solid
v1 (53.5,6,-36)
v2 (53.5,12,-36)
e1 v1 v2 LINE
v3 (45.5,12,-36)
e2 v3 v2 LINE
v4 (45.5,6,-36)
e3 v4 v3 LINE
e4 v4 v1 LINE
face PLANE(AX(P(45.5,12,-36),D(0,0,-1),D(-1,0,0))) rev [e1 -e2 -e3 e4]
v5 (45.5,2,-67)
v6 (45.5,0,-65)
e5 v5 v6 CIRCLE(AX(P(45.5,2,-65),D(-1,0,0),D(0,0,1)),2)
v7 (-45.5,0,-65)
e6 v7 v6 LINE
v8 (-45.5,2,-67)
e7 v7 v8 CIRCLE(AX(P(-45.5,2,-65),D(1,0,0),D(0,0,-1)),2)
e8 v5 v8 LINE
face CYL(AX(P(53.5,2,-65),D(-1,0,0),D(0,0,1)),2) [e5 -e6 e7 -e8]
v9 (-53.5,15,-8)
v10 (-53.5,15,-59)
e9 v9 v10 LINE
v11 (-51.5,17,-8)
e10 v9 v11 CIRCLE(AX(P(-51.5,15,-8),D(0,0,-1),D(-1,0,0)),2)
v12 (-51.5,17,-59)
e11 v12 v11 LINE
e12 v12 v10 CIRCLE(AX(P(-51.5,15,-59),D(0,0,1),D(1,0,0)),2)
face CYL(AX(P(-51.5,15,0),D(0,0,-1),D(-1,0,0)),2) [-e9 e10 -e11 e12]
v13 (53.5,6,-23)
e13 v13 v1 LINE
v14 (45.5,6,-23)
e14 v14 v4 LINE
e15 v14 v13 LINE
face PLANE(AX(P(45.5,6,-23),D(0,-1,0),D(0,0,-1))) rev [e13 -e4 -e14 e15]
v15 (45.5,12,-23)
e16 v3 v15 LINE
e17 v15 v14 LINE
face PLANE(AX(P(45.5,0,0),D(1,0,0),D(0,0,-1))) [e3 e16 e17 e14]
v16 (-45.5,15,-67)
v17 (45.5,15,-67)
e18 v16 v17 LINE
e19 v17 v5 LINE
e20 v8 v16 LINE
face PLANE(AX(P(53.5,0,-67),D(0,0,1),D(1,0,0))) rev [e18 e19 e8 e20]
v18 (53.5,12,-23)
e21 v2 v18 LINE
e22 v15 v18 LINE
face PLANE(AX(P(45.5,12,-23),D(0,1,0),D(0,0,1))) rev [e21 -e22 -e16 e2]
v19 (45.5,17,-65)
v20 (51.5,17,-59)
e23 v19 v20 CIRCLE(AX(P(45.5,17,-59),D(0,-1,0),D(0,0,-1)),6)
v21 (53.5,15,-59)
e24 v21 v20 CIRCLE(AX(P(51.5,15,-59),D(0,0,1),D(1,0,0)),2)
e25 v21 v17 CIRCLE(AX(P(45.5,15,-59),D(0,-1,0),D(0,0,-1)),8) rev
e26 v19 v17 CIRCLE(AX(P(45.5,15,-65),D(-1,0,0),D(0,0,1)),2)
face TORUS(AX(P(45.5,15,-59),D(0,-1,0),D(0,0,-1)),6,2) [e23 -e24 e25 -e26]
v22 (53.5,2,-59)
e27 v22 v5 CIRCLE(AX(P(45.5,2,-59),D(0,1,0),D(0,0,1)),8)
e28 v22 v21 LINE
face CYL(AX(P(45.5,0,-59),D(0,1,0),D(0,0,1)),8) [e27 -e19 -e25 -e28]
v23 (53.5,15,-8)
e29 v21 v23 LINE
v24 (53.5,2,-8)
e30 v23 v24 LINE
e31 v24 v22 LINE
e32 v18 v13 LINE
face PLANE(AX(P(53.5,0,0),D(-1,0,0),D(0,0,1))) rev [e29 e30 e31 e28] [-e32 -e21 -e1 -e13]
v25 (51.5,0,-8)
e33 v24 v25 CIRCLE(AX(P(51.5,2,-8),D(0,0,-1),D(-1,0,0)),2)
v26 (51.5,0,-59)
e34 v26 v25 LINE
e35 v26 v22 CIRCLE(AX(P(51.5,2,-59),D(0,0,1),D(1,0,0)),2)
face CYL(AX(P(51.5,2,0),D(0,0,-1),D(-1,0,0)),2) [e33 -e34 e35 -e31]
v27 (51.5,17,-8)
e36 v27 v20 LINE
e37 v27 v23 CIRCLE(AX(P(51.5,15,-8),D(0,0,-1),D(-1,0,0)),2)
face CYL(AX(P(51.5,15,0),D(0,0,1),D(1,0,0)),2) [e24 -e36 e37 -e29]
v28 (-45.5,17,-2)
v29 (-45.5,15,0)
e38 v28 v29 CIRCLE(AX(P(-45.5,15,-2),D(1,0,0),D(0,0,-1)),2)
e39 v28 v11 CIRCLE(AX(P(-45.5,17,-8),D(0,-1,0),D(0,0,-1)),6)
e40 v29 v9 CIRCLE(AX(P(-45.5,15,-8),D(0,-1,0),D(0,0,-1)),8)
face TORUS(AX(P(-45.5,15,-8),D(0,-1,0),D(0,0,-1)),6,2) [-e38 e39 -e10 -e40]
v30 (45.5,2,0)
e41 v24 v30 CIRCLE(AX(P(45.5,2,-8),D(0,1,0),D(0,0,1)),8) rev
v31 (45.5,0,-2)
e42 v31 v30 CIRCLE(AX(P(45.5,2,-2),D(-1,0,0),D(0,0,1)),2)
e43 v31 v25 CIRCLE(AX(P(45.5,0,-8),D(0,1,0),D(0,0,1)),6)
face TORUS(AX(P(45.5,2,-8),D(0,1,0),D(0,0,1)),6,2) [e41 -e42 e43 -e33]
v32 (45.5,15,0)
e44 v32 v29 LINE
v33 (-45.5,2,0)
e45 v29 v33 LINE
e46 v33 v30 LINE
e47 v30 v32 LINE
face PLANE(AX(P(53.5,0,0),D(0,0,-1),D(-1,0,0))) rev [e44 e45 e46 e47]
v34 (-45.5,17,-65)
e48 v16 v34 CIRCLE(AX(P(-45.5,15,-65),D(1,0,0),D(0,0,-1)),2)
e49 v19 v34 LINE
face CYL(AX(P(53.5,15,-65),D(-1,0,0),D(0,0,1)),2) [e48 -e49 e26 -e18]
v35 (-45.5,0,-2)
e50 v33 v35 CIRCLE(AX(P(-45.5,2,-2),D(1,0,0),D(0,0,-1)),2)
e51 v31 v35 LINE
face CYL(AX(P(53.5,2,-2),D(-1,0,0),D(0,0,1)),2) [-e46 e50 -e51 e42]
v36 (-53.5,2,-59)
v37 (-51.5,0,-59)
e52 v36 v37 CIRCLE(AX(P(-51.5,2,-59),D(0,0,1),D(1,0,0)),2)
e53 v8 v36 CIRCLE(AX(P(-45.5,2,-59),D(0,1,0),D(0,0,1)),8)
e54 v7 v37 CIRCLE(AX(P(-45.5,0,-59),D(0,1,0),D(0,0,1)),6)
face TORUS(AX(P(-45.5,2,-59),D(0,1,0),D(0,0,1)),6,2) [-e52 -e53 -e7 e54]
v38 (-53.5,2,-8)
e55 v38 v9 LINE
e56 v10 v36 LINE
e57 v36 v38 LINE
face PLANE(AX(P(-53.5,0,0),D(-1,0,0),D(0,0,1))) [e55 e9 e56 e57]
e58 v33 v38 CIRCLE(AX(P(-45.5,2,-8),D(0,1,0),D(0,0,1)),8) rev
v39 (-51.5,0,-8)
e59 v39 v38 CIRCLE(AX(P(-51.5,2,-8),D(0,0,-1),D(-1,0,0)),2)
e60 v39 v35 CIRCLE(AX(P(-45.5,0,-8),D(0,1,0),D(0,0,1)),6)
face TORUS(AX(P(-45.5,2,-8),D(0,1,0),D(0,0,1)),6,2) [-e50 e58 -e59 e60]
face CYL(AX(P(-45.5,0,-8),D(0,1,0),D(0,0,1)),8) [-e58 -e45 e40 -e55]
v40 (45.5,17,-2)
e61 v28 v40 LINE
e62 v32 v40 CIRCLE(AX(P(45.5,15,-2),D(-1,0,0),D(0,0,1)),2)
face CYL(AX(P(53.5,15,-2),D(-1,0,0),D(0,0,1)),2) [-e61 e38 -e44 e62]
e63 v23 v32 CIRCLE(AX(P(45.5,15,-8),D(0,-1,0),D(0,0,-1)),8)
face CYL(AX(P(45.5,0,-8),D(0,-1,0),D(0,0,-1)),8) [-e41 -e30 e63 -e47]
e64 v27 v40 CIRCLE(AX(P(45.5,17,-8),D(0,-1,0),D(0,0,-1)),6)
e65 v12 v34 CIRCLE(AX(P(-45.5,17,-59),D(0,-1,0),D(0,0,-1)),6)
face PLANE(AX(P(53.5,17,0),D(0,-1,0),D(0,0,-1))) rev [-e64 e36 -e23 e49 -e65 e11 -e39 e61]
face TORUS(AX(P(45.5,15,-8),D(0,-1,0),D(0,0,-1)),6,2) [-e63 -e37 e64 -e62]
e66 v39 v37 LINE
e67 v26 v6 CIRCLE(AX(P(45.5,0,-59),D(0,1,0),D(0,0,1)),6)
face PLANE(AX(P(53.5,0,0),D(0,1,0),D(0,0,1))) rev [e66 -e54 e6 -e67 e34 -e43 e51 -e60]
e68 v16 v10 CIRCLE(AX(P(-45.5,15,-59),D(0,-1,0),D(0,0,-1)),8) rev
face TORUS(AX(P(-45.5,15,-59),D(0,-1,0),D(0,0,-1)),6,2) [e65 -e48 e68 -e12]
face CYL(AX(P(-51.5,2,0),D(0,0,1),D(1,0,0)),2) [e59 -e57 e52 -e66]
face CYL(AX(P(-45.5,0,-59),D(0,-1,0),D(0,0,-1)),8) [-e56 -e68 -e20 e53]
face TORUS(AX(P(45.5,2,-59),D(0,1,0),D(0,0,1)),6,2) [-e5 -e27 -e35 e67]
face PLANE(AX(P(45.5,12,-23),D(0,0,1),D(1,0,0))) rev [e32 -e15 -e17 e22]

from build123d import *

# Parameters (mm, degrees)
SKETCH1_W           = 67
SKETCH1_H           = 17
BOSS_EXTRUDE1_DEPTH = 53.5
FILLET1_R           = 2
FILLET2_R           = 8
SKETCH2_W           = 13
SKETCH2_H           = 6
CUT_EXTRUDE1_DEPTH  = 8


with BuildPart() as part:
    # Sketch1 → Boss-Extrude1 (new, symmetric)
    with BuildSketch(Plane(origin=(0, 0, 0), x_dir=(0, 0, -1), z_dir=(1, 0, 0))):
        with Locations((33.5, 8.5)):
            Rectangle(SKETCH1_W, SKETCH1_H)
    extrude(amount=BOSS_EXTRUDE1_DEPTH, both=True)

    # Fillet1
    fillet1_edges = [part.edges().sort_by_distance(p)[0] for p in [
        (53.5, 17, -33.5),
        (-53.5, 17, -33.5),
        (-53.5, 0, -33.5),
        (0, 17, 0),
        (0, 17, -67),
        (0, 0, -67),
        (0, 0, 0),
        (53.5, 0, -33.5),
    ]]
    fillet(fillet1_edges, radius=FILLET1_R)

    # Fillet2
    # the kernel refuses this fillet: 8 mm, written as the material it takes off along each edge
    with BuildSketch(Plane(origin=(45.5, 0, -8), x_dir=(1, 0, 0), z_dir=(0, 0, -1))) as fillet2_piece_1:
        with BuildLine():
            CenterArc((6, -2), 2, 0, 90)
            Line((8, -2), (8, 0))
            Line((8, 0), (6, 0))
        make_face()
    revolve(axis=Axis((45.5, 0, -8), (0, -1, 0)), revolution_arc=90, mode=Mode.SUBTRACT)
    with BuildSketch(Plane(origin=(45.5, 0, -59), x_dir=(0, 0, -1), z_dir=(-1, 0, 0))) as fillet2_piece_2:
        with BuildLine():
            CenterArc((6, -2), 2, 0, 90)
            Line((8, -2), (8, 0))
            Line((8, 0), (6, 0))
        make_face()
    revolve(axis=Axis((45.5, 0, -59), (0, -1, 0)), revolution_arc=90, mode=Mode.SUBTRACT)
    with BuildSketch(Plane(origin=(-45.5, 0, -8), x_dir=(0, 0, 1), z_dir=(1, 0, 0))) as fillet2_piece_3:
        with BuildLine():
            CenterArc((6, -2), 2, 0, 90)
            Line((8, -2), (8, 0))
            Line((8, 0), (6, 0))
        make_face()
    revolve(axis=Axis((-45.5, 0, -8), (0, -1, 0)), revolution_arc=90, mode=Mode.SUBTRACT)
    with BuildSketch(Plane(origin=(-45.5, 0, -59), x_dir=(-1, 0, 0), z_dir=(0, 0, 1))) as fillet2_piece_4:
        with BuildLine():
            CenterArc((6, -2), 2, 0, 90)
            Line((8, -2), (8, 0))
            Line((8, 0), (6, 0))
        make_face()
    revolve(axis=Axis((-45.5, 0, -59), (0, -1, 0)), revolution_arc=90, mode=Mode.SUBTRACT)
    with BuildSketch(Plane(origin=(45.5, 17, -59), x_dir=(1, 0, 0), z_dir=(0, 0, 1))) as fillet2_piece_5:
        with BuildLine():
            CenterArc((6, -2), 2, 0, 90)
            Line((8, -2), (8, 0))
            Line((8, 0), (6, 0))
        make_face()
    revolve(axis=Axis((45.5, 17, -59), (0, 1, 0)), revolution_arc=90, mode=Mode.SUBTRACT)
    with BuildSketch(Plane(origin=(45.5, 17, -8), x_dir=(0, 0, 1), z_dir=(-1, 0, 0))) as fillet2_piece_6:
        with BuildLine():
            CenterArc((6, -2), 2, 0, 90)
            Line((8, -2), (8, 0))
            Line((8, 0), (6, 0))
        make_face()
    revolve(axis=Axis((45.5, 17, -8), (0, 1, 0)), revolution_arc=90, mode=Mode.SUBTRACT)
    with BuildSketch(Plane(origin=(-45.5, 17, -59), x_dir=(0, 0, -1), z_dir=(1, 0, 0))) as fillet2_piece_7:
        with BuildLine():
            CenterArc((6, -2), 2, 0, 90)
            Line((8, -2), (8, 0))
            Line((8, 0), (6, 0))
        make_face()
    revolve(axis=Axis((-45.5, 17, -59), (0, 1, 0)), revolution_arc=90, mode=Mode.SUBTRACT)
    with BuildSketch(Plane(origin=(-45.5, 17, -8), x_dir=(-1, 0, 0), z_dir=(0, 0, -1))) as fillet2_piece_8:
        with BuildLine():
            CenterArc((6, -2), 2, 0, 90)
            Line((8, -2), (8, 0))
            Line((8, 0), (6, 0))
        make_face()
    revolve(axis=Axis((-45.5, 17, -8), (0, 1, 0)), revolution_arc=90, mode=Mode.SUBTRACT)
    with BuildSketch(Plane(origin=(-53.5, 17, 0), x_dir=(0, 0, -1), z_dir=(0, -1, 0)), Plane(origin=(-53.5, 0, -67), x_dir=(0, 0, 1), z_dir=(0, 1, 0)), Plane(origin=(53.5, 17, 0), x_dir=(-1, 0, 0), z_dir=(0, -1, 0)), Plane(origin=(53.5, 0, -67), x_dir=(-1, 0, 0), z_dir=(0, 1, 0))) as fillet2_piece_9:
        with BuildLine():
            CenterArc((FILLET2_R, FILLET2_R), FILLET2_R, 180, 90)
            Line((0, FILLET2_R), (0, 0))
            Line((0, 0), (FILLET2_R, 0))
        make_face()
    extrude(amount=17, mode=Mode.SUBTRACT)

    # Sketch2 → Cut-Extrude1 (cut)
    with BuildSketch(Plane(origin=(53.5, 0, 0), x_dir=(0, 0, -1), z_dir=(1, 0, 0))):
        with Locations((29.5, 9)):
            Rectangle(SKETCH2_W, SKETCH2_H)
    extrude(amount=-CUT_EXTRUDE1_DEPTH, mode=Mode.SUBTRACT)


solid = part.part
